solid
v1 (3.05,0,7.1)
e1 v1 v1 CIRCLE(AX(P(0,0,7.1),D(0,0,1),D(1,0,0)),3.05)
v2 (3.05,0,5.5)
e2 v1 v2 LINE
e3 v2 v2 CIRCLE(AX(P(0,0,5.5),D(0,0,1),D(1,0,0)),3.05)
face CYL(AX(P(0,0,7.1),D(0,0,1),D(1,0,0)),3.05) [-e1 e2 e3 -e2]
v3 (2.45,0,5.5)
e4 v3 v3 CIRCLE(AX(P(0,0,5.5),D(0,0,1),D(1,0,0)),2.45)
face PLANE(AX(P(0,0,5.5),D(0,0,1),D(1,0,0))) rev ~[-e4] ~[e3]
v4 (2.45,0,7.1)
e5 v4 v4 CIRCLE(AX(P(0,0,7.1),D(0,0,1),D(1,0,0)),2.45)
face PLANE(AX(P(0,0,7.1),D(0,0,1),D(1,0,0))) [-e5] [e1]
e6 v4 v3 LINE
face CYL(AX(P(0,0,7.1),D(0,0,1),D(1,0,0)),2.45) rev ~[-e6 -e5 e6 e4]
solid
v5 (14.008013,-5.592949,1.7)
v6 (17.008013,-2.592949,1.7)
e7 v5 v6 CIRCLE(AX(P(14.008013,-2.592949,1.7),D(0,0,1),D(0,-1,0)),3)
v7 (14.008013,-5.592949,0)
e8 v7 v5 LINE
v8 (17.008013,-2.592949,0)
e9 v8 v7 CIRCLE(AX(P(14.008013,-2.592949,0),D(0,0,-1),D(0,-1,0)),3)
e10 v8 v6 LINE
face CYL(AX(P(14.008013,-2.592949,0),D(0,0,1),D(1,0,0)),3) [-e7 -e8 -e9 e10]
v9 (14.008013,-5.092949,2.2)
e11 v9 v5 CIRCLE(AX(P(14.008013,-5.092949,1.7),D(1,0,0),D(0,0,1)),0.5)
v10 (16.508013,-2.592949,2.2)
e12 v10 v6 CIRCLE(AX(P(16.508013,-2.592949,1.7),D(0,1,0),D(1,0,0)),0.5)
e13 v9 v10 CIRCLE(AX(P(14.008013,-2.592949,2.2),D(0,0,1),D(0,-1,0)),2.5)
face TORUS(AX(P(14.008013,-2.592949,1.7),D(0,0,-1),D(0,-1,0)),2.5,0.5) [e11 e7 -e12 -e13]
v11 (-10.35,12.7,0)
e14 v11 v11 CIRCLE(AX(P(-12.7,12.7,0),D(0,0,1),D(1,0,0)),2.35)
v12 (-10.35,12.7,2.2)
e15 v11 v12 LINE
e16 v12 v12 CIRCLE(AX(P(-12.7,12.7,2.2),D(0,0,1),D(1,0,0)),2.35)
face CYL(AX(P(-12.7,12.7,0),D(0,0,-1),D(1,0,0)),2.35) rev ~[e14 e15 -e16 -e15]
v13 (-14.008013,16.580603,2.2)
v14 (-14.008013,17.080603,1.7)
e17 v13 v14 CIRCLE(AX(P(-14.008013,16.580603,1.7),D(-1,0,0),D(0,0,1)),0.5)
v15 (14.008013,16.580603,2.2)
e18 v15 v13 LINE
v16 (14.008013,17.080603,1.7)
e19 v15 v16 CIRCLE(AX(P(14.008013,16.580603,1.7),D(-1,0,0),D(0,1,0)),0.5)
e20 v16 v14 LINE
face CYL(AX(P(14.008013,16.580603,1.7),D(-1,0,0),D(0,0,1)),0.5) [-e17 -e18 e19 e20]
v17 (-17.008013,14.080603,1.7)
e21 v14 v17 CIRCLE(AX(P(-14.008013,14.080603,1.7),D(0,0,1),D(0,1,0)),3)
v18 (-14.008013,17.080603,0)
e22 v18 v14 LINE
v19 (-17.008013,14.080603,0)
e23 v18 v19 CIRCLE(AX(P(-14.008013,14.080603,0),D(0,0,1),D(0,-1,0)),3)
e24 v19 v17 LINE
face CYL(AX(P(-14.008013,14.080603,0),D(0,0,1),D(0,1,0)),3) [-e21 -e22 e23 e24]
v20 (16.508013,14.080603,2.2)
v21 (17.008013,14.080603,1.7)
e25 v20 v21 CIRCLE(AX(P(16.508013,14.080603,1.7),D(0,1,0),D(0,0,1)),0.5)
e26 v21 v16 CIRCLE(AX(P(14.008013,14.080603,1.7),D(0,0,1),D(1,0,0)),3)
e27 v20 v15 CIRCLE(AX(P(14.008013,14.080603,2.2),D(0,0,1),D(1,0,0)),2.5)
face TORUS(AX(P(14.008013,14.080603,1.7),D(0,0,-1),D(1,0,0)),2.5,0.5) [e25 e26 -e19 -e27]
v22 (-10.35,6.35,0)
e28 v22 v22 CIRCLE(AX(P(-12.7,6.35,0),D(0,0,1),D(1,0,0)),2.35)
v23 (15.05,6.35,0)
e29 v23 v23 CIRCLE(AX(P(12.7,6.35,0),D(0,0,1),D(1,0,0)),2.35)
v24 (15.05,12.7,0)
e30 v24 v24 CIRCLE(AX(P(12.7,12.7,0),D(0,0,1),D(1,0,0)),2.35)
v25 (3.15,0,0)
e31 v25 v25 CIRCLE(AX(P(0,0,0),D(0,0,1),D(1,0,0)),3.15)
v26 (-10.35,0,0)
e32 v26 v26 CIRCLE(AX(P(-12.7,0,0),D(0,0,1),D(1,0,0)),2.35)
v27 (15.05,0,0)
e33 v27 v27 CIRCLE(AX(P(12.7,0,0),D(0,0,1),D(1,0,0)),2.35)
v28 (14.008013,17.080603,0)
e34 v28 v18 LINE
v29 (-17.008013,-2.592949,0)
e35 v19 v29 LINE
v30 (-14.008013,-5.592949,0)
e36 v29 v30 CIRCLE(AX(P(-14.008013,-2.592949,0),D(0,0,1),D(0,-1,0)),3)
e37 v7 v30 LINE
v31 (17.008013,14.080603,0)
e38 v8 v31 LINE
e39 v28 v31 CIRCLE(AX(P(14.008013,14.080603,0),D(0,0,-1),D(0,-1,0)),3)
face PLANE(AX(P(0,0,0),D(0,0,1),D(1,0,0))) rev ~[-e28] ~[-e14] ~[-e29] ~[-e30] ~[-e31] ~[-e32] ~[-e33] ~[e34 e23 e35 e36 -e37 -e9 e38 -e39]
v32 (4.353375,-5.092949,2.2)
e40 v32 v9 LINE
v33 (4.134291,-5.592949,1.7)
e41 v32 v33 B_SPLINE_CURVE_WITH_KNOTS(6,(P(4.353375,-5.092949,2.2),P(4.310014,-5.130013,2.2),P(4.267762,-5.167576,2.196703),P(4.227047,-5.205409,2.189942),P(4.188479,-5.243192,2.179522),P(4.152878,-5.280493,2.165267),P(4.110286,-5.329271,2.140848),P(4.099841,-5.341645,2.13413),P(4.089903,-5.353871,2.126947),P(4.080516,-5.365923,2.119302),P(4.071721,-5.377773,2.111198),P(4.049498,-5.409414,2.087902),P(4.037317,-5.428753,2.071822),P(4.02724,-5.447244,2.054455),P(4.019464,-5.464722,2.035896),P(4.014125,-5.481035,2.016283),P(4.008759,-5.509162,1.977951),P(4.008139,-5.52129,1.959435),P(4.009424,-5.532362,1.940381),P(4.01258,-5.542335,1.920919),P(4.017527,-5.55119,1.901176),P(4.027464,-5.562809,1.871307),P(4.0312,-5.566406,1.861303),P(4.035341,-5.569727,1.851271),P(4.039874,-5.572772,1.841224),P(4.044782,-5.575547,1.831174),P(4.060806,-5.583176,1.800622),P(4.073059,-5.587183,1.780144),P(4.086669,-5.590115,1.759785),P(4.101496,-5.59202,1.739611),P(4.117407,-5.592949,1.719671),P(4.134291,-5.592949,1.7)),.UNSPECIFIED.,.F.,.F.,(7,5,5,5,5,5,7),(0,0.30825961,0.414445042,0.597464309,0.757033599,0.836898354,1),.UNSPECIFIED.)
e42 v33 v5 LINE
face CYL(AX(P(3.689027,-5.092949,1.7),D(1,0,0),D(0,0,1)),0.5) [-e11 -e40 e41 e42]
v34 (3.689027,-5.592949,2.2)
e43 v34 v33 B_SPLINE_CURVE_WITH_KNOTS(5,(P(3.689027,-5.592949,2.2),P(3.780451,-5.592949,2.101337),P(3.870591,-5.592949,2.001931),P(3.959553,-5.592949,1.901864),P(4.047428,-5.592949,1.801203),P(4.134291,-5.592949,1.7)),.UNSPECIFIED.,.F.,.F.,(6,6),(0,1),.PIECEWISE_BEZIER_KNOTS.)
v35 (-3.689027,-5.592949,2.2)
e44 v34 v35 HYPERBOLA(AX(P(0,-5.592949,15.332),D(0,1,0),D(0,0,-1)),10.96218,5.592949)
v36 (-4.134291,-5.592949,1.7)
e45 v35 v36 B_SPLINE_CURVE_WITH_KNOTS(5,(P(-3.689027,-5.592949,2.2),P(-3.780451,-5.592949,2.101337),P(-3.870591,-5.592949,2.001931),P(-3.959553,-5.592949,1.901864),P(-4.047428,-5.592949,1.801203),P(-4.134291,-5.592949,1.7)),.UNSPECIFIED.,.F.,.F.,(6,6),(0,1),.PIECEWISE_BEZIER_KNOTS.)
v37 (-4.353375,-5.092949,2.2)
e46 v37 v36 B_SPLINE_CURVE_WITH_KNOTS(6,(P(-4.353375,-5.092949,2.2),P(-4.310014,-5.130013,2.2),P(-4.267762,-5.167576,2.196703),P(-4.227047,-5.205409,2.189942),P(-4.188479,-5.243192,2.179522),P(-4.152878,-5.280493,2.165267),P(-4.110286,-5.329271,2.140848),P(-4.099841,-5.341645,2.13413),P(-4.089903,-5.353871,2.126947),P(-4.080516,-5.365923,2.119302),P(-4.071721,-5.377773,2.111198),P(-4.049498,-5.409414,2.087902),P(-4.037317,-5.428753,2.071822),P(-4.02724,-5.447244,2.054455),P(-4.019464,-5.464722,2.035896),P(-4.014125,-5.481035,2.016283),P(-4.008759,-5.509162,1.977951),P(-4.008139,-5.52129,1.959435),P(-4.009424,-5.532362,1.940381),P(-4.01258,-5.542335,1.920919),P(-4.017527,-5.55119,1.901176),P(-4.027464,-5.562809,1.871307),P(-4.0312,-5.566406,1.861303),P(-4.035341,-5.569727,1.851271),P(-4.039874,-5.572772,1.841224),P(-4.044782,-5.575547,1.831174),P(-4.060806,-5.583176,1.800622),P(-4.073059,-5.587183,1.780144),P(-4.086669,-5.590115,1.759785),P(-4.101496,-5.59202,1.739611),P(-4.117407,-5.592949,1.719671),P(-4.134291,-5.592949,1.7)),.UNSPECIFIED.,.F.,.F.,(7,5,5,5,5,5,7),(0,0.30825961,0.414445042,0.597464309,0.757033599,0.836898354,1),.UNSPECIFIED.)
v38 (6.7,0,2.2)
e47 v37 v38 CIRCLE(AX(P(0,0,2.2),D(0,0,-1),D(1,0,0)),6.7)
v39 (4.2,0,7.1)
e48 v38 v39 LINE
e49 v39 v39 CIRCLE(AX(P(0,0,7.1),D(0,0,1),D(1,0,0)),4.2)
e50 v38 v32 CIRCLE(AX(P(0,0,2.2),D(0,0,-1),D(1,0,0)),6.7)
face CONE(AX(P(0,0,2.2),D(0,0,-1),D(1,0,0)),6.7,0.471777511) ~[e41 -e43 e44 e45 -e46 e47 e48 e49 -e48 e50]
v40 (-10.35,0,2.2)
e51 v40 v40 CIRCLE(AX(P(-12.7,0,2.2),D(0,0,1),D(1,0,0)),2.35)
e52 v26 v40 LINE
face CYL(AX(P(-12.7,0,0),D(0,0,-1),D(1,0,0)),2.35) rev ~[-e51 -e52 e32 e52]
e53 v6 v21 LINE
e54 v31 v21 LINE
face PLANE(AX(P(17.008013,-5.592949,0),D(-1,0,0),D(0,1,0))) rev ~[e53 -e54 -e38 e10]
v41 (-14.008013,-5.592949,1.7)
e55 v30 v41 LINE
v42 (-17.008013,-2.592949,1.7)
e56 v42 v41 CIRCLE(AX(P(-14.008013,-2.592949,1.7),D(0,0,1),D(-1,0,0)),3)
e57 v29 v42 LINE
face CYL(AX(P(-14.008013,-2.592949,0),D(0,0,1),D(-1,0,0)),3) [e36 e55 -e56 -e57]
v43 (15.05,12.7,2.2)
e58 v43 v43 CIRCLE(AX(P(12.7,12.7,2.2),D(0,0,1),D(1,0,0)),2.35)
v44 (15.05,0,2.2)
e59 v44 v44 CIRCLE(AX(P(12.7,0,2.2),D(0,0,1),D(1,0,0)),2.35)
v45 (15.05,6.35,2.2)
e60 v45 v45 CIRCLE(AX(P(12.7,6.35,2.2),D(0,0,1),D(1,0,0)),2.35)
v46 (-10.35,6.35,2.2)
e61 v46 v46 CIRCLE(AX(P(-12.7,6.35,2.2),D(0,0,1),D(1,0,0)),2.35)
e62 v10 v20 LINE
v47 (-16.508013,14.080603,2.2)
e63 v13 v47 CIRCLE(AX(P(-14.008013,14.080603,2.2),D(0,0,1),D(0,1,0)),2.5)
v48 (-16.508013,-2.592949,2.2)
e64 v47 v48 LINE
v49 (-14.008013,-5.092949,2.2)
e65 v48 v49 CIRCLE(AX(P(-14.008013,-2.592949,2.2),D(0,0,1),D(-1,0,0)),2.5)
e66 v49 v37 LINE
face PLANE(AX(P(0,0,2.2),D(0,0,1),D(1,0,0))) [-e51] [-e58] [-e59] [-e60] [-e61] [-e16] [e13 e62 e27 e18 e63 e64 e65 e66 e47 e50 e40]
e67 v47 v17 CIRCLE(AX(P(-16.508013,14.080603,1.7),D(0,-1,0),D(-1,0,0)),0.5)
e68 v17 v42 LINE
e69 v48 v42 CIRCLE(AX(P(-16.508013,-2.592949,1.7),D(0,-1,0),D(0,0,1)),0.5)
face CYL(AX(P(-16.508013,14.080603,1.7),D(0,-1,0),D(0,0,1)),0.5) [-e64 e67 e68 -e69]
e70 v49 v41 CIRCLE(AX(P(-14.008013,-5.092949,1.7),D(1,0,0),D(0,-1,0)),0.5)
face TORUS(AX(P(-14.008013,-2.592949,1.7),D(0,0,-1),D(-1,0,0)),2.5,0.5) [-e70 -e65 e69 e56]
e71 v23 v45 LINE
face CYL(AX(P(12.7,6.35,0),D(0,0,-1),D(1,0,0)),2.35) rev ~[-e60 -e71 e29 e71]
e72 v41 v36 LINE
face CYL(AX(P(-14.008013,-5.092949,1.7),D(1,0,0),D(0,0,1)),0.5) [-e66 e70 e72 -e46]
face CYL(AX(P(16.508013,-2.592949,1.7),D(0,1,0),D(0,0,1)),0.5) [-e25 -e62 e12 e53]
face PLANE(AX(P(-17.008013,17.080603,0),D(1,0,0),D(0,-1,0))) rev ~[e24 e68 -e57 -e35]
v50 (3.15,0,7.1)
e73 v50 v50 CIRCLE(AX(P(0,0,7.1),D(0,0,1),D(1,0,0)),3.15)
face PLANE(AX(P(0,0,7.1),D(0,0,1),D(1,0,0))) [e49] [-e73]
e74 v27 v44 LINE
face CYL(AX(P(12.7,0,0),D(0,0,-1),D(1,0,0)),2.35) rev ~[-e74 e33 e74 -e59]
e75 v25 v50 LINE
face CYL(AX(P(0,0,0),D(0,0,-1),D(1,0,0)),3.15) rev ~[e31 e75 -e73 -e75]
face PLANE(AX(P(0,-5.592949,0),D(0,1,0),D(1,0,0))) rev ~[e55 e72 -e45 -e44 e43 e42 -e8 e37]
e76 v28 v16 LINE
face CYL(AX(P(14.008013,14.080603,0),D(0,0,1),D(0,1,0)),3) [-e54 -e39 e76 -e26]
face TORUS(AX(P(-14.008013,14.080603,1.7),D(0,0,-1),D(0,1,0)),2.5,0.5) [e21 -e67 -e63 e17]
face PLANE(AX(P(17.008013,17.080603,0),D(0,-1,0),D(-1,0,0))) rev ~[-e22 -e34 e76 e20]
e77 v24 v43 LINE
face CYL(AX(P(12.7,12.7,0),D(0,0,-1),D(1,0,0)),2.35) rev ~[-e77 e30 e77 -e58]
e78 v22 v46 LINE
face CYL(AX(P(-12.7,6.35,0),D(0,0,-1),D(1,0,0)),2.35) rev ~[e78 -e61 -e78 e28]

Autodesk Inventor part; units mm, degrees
ref_plane "YZ Plane" through (0, 0, 0) normal (1, 0, 0) x (0, 1, 0)
ref_plane "XZ Plane" through (0, 0, 0) normal (0, 1, 0) x (-1, 0, 0)
ref_plane "XY Plane" through (0, 0, 0) normal (0, 0, 1) x (1, 0, 0)
sketch "Sketch1" plane through (0, 0, 0) normal (0, 0, 1) x (1, 0, 0)
  circle A0 centre (0, 0) radius 3.15
  line L0 (0, 0) -> (12.7, 0) construction
  circle A1 centre (12.7, 0) radius 2.35
  line L1 (0, 0) -> (0, 14.467027) construction
  circle A2 centre (12.7, 6.35) radius 2.35
  circle A3 centre (12.7, 12.7) radius 2.35
  line L2 (0, -10.866161) -> (0, 17.080603) construction
  line L3 (0, 17.080603) -> (17.008013, 17.080603) construction
  line L4 (17.008013, 17.080603) -> (17.008013, -10.866161) construction
  line L5 (17.008013, -10.866161) -> (0, -10.866161) construction
  line L6 (0, 17.080603) -> (17.008013, 17.080603)
  line L7 (17.008013, 17.080603) -> (17.008013, -5.592949)
  line L8 (17.008013, -5.592949) -> (0, -5.592949)
  line L9 (0, -5.592949) -> (0, 17.080603)
  line L10 (0, 17.080603) -> (-17.008013, 17.080603) construction
  line L11 (0, 17.080603) -> (-17.008013, 17.080603)
  line L12 (-17.008013, -5.592949) -> (0, -5.592949)
  circle A4 centre (-12.7, 0) radius 2.35
  circle A5 centre (-12.7, 6.35) radius 2.35
  circle A6 centre (-12.7, 12.7) radius 2.35
  line L13 (-17.008013, 17.080603) -> (-17.008013, -5.592949)
  circle A7 centre (0, 0) radius 5.592949
  circle A8 centre (0, 0) radius 4.2
  dimension "d0" = 6.3
  dimension "d1" = 12.7
  dimension "d2" = 4.7
  dimension "d5" = 6.35
  dimension "d12" = 8.4
sketch "Sketch1 outline for Extrusion1" plane through (0, 0, 0) normal (0, 0, 1) x (1, 0, 0)
  line L0 (0, 17.080603) -> (-17.008013, 17.080603)
  line L1 (17.008013, 17.080603) -> (0, 17.080603)
  line L2 (-17.008013, 17.080603) -> (-17.008013, -5.592949)
  line L3 (17.008013, -5.592949) -> (17.008013, 17.080603)
  line L4 (-17.008013, -5.592949) -> (0, -5.592949)
  line L5 (0, -5.592949) -> (17.008013, -5.592949)
  circle A0 centre (-12.7, 0) radius 2.35
  circle A1 centre (0, 0) radius 3.15
  circle A2 centre (12.7, 0) radius 2.35
  circle A3 centre (-12.7, 6.35) radius 2.35
  circle A4 centre (-12.7, 12.7) radius 2.35
  circle A5 centre (12.7, 6.35) radius 2.35
  circle A6 centre (12.7, 12.7) radius 2.35
extrude "Extrusion1" add sketch "Sketch1 outline for Extrusion1" along normal blind 2.2
sketch "Sketch1 outline for Extrusion3" plane through (0, 0, 0) normal (0, 0, 1) x (1, 0, 0)
  circle A0 centre (0, 0) radius 4.2
  circle A1 centre (0, 0) radius 3.15
extrude "Extrusion3" add sketch "Sketch1 outline for Extrusion3" along normal blind 7.1
chamfer "Chamfer1" distance 2.5 distance2 4.9 1 edges at (-4.2, 0, 2.2)
sketch "Sketch2" plane through (0, 0, 7.1) normal (0, 0, 1) x (1, 0, 0)
  circle A0 centre (0, 0) radius 2.45
  circle A1 centre (0, 0) radius 3.05
  dimension "d20" = 4.9
sketch "Sketch2 outline for Extrusion4" plane through (0, 0, 7.1) normal (0, 0, 1) x (1, 0, 0)
  circle A0 centre (0, 0) radius 3.05
  circle A1 centre (0, 0) radius 2.45
extrude "Extrusion4" add sketch "Sketch2 outline for Extrusion4" against normal blind 1.6
fillet "Fillet1" radius 3 4 edges at (-17.008, -5.5929, 1.1) (17.008, -5.5929, 1.1) (17.008, 17.0806, 1.1) (-17.008, 17.0806, 1.1)
fillet "Fillet2" radius 0.5 8 edges at (-16.1293, 16.2019, 2.2) (-17.008, 5.7438, 2.2) (-16.1293, -4.7143, 2.2) (8.8485, -5.5929, 2.2) (16.1293, 16.2019, 2.2) (17.008, 5.7438, 2.2) (16.1293, -4.7143, 2.2) (0, 17.0806, 2.2)
properties part number "RevMagnetHolder-1inchmounts"
